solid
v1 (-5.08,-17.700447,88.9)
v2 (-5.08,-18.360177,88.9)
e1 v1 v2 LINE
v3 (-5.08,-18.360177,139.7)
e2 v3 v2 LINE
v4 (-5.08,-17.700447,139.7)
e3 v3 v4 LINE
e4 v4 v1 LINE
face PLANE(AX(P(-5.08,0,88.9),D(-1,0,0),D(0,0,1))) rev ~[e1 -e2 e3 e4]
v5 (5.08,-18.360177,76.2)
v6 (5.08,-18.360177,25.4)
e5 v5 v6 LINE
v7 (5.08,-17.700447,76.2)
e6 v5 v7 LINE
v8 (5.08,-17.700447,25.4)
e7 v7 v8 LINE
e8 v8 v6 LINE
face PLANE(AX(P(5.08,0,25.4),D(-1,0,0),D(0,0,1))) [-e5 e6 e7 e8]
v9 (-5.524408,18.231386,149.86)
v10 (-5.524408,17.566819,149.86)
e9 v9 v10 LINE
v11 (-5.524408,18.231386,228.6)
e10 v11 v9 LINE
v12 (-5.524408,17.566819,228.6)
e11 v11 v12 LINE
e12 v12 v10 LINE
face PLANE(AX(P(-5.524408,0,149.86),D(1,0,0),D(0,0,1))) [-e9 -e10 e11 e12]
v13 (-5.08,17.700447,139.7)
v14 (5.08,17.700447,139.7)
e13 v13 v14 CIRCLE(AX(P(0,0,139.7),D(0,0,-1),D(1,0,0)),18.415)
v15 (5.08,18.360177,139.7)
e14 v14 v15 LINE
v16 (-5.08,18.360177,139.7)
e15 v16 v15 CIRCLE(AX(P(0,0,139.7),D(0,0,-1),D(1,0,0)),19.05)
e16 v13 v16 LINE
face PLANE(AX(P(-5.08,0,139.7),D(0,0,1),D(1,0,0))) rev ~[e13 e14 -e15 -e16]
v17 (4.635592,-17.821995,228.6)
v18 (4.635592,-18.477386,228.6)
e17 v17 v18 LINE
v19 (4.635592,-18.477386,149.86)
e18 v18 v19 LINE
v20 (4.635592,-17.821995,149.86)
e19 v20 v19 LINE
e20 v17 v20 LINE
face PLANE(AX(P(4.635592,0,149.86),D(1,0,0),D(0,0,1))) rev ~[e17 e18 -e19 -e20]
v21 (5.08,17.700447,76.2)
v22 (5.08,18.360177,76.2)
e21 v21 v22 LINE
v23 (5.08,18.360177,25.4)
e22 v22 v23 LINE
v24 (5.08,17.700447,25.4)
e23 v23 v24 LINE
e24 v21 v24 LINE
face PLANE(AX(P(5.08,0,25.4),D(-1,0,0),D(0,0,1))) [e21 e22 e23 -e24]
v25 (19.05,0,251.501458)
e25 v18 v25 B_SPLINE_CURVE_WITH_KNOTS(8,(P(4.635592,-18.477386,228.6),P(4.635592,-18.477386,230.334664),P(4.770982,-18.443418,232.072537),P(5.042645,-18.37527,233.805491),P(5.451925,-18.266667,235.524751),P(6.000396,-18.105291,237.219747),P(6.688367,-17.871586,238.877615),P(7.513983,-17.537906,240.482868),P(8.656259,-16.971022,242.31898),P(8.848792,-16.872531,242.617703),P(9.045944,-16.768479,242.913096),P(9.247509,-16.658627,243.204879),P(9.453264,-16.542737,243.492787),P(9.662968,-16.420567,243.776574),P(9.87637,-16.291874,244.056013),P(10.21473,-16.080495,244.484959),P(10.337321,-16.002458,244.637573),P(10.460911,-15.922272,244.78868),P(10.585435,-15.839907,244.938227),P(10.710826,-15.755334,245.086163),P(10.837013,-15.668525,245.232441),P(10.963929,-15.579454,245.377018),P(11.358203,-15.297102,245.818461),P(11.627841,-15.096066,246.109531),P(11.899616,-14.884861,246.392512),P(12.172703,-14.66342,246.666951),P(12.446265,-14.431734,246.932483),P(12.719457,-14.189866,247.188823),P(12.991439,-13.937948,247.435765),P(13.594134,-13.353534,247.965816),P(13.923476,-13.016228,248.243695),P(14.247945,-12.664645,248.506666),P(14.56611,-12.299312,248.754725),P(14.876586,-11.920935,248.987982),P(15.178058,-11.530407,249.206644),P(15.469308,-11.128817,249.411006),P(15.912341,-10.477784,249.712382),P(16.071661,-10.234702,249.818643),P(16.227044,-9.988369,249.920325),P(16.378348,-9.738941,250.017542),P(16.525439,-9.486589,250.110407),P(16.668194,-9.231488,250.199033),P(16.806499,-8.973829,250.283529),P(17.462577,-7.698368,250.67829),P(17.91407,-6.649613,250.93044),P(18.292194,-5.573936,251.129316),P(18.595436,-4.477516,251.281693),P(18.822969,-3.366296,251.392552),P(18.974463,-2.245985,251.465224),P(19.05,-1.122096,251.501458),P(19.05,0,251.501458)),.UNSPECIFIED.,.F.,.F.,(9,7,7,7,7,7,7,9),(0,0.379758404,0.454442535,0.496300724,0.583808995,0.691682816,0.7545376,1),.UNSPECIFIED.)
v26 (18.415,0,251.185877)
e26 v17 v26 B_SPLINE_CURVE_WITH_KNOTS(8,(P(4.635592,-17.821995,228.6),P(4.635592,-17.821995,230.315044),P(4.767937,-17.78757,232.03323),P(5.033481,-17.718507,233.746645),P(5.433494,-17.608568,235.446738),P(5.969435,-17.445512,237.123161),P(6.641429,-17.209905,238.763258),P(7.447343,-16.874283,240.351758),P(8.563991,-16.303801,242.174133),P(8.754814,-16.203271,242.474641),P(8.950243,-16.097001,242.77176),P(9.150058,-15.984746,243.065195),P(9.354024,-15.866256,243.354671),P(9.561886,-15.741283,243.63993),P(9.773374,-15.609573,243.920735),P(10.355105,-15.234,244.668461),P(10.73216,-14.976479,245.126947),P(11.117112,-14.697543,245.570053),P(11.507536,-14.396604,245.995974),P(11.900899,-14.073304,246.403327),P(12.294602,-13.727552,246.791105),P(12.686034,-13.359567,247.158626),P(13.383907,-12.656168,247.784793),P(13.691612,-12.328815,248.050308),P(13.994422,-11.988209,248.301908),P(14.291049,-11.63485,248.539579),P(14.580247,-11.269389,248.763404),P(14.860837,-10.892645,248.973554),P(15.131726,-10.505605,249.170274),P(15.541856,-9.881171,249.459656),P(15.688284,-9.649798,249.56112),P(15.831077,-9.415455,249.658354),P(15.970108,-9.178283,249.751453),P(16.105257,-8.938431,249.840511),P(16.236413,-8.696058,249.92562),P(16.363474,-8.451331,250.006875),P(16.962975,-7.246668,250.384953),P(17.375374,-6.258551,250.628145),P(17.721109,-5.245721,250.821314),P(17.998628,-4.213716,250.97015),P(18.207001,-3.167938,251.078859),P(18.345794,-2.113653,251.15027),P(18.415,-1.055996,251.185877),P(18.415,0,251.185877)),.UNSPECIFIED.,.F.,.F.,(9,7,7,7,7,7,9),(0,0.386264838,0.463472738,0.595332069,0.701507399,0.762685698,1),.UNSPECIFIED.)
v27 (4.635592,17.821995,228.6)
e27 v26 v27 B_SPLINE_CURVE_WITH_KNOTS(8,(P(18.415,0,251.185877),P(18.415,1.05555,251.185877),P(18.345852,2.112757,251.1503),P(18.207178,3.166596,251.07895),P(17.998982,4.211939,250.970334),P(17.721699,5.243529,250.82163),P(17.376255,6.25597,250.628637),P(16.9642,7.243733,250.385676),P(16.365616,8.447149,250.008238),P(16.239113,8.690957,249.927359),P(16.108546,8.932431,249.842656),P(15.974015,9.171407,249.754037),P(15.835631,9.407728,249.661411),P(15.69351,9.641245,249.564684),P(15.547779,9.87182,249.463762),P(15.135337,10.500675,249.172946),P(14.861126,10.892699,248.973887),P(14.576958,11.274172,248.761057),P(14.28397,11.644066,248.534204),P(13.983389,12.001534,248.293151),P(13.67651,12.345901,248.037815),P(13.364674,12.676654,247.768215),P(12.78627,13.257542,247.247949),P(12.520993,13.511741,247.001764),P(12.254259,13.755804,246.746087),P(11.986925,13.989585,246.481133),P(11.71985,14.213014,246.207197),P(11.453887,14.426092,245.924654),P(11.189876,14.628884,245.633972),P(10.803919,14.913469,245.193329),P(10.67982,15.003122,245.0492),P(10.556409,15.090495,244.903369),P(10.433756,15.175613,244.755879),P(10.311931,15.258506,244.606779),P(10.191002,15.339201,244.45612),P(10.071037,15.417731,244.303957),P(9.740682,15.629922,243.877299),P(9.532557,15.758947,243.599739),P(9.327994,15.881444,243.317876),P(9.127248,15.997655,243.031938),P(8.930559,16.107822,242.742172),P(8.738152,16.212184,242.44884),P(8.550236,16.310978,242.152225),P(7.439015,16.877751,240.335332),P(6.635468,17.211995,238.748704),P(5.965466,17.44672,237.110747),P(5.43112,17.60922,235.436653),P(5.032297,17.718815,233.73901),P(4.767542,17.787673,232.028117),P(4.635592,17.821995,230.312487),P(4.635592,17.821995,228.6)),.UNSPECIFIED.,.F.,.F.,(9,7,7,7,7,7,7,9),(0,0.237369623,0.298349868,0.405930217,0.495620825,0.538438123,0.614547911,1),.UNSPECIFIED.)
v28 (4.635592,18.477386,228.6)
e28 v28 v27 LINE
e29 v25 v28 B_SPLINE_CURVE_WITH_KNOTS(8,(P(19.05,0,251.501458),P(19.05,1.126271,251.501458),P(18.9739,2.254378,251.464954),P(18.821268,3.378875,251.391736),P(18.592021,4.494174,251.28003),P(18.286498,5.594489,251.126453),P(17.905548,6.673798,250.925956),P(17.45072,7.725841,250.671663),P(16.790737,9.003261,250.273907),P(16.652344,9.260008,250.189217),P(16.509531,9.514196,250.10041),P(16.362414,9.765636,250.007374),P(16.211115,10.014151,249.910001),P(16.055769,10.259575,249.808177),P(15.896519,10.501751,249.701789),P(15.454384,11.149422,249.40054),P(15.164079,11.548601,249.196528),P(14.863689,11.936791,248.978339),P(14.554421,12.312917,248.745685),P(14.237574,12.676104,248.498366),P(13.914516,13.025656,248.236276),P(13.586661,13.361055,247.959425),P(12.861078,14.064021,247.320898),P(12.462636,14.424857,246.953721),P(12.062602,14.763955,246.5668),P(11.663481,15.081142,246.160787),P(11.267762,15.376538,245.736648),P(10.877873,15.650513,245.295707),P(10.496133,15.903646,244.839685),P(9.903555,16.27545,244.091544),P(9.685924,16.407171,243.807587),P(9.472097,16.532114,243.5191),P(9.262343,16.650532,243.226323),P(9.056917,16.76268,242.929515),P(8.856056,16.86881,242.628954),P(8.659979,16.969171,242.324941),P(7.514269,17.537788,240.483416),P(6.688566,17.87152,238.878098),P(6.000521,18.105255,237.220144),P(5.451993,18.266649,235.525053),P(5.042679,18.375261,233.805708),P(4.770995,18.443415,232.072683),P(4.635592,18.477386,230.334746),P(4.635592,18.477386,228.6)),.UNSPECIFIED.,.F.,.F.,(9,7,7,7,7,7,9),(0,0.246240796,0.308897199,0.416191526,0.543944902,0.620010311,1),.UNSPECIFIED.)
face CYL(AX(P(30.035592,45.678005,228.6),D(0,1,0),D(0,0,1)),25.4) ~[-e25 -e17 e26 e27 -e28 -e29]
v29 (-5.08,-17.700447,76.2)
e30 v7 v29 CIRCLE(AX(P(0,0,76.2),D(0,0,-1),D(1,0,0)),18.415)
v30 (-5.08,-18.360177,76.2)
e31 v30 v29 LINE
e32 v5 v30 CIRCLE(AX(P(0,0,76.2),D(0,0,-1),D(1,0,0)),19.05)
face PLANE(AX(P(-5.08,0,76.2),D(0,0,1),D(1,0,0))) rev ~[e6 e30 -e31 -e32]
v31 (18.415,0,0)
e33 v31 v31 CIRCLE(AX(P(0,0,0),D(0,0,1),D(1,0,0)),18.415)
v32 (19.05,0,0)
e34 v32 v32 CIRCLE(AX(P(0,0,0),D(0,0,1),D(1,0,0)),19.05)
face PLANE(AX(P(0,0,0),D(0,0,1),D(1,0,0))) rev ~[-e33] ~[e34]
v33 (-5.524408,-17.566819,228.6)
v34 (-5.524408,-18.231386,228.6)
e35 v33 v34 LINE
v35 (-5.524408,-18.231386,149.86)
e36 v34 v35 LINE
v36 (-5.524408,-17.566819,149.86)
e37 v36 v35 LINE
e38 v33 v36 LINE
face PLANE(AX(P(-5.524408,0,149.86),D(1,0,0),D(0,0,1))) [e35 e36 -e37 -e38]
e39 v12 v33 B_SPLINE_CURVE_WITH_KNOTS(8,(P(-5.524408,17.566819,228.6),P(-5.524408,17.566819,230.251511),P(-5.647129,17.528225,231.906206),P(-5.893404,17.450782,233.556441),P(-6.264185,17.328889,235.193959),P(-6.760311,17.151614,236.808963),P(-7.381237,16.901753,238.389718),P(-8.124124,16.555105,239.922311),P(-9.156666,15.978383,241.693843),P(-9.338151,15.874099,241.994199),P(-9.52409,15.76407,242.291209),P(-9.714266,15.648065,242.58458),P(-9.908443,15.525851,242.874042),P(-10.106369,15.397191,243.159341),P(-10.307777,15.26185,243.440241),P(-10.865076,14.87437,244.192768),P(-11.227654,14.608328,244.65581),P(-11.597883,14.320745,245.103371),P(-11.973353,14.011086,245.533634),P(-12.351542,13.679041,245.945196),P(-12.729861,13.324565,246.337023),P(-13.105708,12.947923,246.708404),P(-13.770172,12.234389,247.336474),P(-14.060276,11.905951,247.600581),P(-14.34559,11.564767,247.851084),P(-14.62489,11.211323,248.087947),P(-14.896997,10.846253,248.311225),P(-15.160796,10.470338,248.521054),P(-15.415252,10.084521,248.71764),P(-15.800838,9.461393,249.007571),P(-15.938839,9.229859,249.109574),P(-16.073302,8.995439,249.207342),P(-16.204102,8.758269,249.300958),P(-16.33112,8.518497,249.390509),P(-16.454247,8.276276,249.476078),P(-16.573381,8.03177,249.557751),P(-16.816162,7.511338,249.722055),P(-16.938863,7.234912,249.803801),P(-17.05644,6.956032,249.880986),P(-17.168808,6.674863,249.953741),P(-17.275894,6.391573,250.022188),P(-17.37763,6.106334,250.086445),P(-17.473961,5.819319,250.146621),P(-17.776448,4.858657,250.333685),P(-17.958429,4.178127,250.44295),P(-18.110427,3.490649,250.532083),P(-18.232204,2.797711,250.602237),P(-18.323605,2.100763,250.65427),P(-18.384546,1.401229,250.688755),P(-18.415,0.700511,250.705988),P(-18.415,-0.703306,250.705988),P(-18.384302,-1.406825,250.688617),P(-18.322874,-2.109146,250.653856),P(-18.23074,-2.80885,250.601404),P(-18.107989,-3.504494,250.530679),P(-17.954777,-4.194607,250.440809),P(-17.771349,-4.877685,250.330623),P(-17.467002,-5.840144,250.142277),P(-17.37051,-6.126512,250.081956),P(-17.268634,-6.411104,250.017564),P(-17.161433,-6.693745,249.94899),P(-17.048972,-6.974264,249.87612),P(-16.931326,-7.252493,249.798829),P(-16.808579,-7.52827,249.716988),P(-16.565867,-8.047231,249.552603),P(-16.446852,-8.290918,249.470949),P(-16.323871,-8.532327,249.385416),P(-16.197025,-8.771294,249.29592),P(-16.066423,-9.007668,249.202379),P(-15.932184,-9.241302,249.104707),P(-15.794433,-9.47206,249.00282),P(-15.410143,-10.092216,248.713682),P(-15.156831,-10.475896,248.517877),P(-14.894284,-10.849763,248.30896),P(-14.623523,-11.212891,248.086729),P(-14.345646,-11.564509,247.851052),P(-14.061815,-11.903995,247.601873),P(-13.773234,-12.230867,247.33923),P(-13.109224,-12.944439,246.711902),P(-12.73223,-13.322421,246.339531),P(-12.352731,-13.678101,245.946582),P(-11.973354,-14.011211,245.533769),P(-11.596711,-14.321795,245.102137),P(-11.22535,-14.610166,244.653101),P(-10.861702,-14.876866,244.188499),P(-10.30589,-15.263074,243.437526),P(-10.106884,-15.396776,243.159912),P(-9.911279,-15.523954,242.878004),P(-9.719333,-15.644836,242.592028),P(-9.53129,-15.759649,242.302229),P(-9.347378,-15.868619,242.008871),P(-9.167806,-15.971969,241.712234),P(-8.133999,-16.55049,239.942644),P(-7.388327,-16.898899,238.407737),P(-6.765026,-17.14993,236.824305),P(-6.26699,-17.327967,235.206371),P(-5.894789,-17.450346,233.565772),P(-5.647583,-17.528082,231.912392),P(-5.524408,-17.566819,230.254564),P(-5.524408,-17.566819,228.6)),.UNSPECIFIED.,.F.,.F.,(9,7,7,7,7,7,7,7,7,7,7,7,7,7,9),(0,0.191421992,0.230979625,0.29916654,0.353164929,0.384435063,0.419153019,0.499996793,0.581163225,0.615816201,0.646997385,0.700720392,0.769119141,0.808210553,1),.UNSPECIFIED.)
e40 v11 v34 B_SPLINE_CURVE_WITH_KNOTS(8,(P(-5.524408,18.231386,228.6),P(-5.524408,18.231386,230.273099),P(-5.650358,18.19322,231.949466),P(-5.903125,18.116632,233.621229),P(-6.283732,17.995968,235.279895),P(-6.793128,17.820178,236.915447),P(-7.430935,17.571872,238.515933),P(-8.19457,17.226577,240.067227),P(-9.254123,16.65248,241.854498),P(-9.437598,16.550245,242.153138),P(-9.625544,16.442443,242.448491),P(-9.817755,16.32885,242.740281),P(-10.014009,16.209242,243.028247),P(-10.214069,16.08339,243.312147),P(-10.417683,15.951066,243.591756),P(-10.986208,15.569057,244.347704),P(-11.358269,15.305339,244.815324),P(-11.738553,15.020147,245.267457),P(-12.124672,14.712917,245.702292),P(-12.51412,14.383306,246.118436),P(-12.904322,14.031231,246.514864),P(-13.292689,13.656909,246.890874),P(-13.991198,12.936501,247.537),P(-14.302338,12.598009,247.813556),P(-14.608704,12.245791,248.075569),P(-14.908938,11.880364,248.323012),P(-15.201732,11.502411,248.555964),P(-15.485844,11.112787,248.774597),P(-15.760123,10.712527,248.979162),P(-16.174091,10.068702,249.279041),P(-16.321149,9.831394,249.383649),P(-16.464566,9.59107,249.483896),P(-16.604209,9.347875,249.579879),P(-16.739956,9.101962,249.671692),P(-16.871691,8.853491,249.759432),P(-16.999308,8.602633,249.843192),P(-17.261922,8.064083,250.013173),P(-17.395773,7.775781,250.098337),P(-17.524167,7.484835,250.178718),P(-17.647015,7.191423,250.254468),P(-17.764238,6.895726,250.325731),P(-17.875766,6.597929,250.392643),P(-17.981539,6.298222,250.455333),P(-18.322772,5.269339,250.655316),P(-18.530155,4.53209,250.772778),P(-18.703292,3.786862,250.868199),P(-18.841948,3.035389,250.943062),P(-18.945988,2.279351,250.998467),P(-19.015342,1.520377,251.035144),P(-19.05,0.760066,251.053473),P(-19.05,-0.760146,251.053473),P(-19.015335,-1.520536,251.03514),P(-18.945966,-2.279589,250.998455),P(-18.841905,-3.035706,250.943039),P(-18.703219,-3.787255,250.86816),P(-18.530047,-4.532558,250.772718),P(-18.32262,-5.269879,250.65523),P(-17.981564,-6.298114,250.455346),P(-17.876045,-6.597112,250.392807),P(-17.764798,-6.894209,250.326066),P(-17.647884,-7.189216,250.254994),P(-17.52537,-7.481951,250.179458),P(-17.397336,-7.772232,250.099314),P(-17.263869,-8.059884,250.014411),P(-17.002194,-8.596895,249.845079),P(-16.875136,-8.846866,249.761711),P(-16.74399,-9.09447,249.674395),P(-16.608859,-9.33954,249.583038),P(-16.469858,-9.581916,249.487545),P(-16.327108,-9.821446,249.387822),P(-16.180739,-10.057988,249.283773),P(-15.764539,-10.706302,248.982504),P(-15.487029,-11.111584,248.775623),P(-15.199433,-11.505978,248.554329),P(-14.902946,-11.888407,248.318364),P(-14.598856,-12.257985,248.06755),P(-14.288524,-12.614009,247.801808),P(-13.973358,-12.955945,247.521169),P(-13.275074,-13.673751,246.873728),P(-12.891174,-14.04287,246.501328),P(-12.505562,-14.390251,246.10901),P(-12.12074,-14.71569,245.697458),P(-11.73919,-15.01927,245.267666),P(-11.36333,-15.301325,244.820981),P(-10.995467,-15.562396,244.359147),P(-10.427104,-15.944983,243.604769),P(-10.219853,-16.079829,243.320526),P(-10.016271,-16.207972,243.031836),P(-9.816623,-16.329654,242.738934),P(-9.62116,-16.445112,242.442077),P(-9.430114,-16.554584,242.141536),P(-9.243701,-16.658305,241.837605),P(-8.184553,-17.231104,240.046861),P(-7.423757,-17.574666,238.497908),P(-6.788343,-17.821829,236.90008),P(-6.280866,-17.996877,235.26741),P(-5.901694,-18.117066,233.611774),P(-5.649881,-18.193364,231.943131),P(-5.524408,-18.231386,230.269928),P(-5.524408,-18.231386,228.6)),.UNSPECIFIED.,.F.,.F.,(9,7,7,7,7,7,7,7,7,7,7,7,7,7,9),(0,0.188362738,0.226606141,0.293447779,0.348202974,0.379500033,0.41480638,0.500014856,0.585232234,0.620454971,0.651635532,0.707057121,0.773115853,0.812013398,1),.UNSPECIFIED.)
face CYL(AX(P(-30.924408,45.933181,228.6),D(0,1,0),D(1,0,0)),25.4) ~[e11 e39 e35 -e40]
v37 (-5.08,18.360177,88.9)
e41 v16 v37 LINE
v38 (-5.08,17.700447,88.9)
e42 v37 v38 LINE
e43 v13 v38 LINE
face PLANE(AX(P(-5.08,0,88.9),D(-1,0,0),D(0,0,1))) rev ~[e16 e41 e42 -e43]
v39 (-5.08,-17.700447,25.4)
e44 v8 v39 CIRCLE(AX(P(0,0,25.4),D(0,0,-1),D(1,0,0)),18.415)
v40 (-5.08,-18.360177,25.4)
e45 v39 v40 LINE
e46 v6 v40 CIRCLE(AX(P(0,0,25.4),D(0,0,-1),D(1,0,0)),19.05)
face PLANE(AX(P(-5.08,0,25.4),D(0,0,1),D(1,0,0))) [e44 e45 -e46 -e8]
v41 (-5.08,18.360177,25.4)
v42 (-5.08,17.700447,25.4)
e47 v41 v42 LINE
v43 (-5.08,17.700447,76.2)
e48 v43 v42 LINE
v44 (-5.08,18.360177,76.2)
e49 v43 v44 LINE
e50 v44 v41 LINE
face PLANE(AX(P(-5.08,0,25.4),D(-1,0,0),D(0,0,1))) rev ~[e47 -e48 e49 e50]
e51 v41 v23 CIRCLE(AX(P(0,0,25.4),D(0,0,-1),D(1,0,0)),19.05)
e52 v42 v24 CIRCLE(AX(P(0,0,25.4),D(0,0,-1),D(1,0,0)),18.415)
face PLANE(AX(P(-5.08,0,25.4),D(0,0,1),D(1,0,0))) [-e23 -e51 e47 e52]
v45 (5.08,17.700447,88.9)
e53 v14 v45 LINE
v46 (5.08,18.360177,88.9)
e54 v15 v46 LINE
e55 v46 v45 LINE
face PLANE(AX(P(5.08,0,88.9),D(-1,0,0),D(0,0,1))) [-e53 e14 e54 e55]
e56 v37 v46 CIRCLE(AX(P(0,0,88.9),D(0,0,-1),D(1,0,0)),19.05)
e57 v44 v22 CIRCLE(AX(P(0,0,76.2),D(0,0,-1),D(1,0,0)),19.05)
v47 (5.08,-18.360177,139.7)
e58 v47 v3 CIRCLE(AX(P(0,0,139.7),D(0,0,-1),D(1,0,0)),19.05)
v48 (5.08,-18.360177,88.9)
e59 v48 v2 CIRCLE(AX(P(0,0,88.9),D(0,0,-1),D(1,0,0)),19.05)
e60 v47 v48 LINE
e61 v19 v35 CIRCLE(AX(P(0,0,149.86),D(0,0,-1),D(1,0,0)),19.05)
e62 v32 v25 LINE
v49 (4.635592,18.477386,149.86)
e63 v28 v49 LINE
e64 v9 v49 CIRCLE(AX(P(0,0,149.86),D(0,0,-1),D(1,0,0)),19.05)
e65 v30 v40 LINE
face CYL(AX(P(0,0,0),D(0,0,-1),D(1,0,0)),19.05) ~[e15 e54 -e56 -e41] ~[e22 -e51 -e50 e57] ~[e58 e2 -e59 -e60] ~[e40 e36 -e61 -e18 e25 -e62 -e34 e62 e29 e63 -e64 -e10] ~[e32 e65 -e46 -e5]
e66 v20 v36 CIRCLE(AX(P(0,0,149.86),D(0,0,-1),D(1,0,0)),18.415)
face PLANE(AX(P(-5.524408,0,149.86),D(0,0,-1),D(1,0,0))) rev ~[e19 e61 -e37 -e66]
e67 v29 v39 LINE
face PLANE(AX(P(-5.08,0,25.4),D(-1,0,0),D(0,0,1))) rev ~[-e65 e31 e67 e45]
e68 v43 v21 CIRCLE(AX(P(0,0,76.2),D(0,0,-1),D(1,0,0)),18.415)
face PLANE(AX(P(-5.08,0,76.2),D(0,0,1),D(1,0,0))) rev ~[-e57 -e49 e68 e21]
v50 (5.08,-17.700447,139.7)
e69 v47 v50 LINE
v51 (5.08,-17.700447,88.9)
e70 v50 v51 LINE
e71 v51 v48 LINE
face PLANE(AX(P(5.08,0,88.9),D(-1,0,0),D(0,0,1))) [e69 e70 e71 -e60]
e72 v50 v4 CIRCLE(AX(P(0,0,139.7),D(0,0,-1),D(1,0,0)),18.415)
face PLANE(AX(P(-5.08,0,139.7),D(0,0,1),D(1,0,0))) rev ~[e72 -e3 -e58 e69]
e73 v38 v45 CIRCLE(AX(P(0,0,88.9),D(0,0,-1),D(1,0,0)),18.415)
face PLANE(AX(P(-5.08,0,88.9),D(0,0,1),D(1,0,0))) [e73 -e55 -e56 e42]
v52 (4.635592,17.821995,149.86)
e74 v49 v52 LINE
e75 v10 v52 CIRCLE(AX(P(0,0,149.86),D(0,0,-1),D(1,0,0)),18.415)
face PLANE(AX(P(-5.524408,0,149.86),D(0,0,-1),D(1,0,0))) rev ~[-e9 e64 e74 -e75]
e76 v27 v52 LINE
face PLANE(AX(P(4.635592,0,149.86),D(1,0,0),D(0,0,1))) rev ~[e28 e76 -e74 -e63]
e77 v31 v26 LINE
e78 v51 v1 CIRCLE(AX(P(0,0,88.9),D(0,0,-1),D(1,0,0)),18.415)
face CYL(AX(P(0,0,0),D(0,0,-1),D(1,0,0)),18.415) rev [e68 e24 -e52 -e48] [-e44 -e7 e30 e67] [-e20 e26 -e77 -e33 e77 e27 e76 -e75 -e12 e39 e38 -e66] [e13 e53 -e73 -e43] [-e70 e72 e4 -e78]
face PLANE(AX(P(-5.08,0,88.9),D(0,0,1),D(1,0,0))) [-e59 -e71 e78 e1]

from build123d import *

# Parameters (mm, degrees)
F0_R        = 19.05
F1_DEPTH    = 254
F2_T        = -0.635
F3_W        = 10.16
F3_H        = 50.8
F3_H_2      = 127
F4_DEPTH    = 38.1
F5_T1_DEPTH = 127.6645661416
F5_T3_DEPTH = 127.6553906563
F5_T5_DEPTH = 127.6553906563
F5_T7_DEPTH = 127.6645661416


# Not quite as in the source:
# - a fillet or chamfer that OpenCascade refuses, or shapes differently, is made with other operations: its cross-section is extruded or revolved along the edge and cut away or added


with BuildPart() as f1:
    # F0 (on Top) → F1 (new body)
    with BuildSketch(Plane.XY):
        Circle(F0_R)
    extrude(amount=F1_DEPTH)

    # F2
    f2_openings = [f1.faces().sort_by_distance(p)[0] for p in [
        (0, 0, 0),
        (0, 0, 254),
    ]]
    offset(amount=F2_T, openings=f2_openings)

    # F3 (on Front) → F4 (cut, symmetric)
    with BuildSketch(Plane.XZ):
        with Locations((0, 50.8)):
            Rectangle(F3_W, F3_H)
        with Locations((-3.17e-08, 114.3)):
            Rectangle(F3_W, F3_H)
        with Locations((-0.4444076066, 213.36)):
            Rectangle(F3_W, F3_H_2)
    extrude(amount=F4_DEPTH, both=True, mode=Mode.SUBTRACT)

    # F5: fillet of radius 25.4 on 4 edges, made by hand

    # F5_s2 → F5_t1 (cut)
    with BuildSketch(Plane.XZ.offset(-45.9331805498)):
        with BuildLine():
            ThreePointArc((-5.5244076066, 228.6), (-12.9638953644, 246.5605122421), (-30.9244076066, 254))
            Line((-30.9244076066, 254), (-5.5244076066, 254))
            Line((-5.5244076066, 254), (-5.5244076066, 228.6))
        make_face()
    extrude(amount=F5_T1_DEPTH, mode=Mode.SUBTRACT)

    # F5_s4 → F5_t3 (cut)
    with BuildSketch(Plane.XZ.offset(-45.6780049332)):
        with BuildLine():
            ThreePointArc((30.0355923934, 254), (12.0750801513, 246.5605122421), (4.6355923934, 228.6))
            Line((4.6355923934, 228.6), (4.6355923934, 254))
            Line((4.6355923934, 254), (30.0355923934, 254))
        make_face()
    extrude(amount=F5_T3_DEPTH, mode=Mode.SUBTRACT)

    # F5_s6 → F5_t5 (cut)
    with BuildSketch(Plane.XZ.offset(-81.9773857231)):
        with BuildLine():
            ThreePointArc((30.0355923934, 254), (12.0750801513, 246.5605122421), (4.6355923934, 228.6))
            Line((4.6355923934, 228.6), (4.6355923934, 254))
            Line((4.6355923934, 254), (30.0355923934, 254))
        make_face()
    extrude(amount=F5_T5_DEPTH, mode=Mode.SUBTRACT)

    # F5_s8 → F5_t7 (cut)
    with BuildSketch(Plane.XZ.offset(-81.7313855918)):
        with BuildLine():
            ThreePointArc((-30.9244076066, 254), (-12.9638953644, 246.5605122421), (-5.5244076066, 228.6))
            Line((-5.5244076066, 228.6), (-5.5244076066, 254))
            Line((-5.5244076066, 254), (-30.9244076066, 254))
        make_face()
    extrude(amount=F5_T7_DEPTH, mode=Mode.SUBTRACT)


solid = f1.part
